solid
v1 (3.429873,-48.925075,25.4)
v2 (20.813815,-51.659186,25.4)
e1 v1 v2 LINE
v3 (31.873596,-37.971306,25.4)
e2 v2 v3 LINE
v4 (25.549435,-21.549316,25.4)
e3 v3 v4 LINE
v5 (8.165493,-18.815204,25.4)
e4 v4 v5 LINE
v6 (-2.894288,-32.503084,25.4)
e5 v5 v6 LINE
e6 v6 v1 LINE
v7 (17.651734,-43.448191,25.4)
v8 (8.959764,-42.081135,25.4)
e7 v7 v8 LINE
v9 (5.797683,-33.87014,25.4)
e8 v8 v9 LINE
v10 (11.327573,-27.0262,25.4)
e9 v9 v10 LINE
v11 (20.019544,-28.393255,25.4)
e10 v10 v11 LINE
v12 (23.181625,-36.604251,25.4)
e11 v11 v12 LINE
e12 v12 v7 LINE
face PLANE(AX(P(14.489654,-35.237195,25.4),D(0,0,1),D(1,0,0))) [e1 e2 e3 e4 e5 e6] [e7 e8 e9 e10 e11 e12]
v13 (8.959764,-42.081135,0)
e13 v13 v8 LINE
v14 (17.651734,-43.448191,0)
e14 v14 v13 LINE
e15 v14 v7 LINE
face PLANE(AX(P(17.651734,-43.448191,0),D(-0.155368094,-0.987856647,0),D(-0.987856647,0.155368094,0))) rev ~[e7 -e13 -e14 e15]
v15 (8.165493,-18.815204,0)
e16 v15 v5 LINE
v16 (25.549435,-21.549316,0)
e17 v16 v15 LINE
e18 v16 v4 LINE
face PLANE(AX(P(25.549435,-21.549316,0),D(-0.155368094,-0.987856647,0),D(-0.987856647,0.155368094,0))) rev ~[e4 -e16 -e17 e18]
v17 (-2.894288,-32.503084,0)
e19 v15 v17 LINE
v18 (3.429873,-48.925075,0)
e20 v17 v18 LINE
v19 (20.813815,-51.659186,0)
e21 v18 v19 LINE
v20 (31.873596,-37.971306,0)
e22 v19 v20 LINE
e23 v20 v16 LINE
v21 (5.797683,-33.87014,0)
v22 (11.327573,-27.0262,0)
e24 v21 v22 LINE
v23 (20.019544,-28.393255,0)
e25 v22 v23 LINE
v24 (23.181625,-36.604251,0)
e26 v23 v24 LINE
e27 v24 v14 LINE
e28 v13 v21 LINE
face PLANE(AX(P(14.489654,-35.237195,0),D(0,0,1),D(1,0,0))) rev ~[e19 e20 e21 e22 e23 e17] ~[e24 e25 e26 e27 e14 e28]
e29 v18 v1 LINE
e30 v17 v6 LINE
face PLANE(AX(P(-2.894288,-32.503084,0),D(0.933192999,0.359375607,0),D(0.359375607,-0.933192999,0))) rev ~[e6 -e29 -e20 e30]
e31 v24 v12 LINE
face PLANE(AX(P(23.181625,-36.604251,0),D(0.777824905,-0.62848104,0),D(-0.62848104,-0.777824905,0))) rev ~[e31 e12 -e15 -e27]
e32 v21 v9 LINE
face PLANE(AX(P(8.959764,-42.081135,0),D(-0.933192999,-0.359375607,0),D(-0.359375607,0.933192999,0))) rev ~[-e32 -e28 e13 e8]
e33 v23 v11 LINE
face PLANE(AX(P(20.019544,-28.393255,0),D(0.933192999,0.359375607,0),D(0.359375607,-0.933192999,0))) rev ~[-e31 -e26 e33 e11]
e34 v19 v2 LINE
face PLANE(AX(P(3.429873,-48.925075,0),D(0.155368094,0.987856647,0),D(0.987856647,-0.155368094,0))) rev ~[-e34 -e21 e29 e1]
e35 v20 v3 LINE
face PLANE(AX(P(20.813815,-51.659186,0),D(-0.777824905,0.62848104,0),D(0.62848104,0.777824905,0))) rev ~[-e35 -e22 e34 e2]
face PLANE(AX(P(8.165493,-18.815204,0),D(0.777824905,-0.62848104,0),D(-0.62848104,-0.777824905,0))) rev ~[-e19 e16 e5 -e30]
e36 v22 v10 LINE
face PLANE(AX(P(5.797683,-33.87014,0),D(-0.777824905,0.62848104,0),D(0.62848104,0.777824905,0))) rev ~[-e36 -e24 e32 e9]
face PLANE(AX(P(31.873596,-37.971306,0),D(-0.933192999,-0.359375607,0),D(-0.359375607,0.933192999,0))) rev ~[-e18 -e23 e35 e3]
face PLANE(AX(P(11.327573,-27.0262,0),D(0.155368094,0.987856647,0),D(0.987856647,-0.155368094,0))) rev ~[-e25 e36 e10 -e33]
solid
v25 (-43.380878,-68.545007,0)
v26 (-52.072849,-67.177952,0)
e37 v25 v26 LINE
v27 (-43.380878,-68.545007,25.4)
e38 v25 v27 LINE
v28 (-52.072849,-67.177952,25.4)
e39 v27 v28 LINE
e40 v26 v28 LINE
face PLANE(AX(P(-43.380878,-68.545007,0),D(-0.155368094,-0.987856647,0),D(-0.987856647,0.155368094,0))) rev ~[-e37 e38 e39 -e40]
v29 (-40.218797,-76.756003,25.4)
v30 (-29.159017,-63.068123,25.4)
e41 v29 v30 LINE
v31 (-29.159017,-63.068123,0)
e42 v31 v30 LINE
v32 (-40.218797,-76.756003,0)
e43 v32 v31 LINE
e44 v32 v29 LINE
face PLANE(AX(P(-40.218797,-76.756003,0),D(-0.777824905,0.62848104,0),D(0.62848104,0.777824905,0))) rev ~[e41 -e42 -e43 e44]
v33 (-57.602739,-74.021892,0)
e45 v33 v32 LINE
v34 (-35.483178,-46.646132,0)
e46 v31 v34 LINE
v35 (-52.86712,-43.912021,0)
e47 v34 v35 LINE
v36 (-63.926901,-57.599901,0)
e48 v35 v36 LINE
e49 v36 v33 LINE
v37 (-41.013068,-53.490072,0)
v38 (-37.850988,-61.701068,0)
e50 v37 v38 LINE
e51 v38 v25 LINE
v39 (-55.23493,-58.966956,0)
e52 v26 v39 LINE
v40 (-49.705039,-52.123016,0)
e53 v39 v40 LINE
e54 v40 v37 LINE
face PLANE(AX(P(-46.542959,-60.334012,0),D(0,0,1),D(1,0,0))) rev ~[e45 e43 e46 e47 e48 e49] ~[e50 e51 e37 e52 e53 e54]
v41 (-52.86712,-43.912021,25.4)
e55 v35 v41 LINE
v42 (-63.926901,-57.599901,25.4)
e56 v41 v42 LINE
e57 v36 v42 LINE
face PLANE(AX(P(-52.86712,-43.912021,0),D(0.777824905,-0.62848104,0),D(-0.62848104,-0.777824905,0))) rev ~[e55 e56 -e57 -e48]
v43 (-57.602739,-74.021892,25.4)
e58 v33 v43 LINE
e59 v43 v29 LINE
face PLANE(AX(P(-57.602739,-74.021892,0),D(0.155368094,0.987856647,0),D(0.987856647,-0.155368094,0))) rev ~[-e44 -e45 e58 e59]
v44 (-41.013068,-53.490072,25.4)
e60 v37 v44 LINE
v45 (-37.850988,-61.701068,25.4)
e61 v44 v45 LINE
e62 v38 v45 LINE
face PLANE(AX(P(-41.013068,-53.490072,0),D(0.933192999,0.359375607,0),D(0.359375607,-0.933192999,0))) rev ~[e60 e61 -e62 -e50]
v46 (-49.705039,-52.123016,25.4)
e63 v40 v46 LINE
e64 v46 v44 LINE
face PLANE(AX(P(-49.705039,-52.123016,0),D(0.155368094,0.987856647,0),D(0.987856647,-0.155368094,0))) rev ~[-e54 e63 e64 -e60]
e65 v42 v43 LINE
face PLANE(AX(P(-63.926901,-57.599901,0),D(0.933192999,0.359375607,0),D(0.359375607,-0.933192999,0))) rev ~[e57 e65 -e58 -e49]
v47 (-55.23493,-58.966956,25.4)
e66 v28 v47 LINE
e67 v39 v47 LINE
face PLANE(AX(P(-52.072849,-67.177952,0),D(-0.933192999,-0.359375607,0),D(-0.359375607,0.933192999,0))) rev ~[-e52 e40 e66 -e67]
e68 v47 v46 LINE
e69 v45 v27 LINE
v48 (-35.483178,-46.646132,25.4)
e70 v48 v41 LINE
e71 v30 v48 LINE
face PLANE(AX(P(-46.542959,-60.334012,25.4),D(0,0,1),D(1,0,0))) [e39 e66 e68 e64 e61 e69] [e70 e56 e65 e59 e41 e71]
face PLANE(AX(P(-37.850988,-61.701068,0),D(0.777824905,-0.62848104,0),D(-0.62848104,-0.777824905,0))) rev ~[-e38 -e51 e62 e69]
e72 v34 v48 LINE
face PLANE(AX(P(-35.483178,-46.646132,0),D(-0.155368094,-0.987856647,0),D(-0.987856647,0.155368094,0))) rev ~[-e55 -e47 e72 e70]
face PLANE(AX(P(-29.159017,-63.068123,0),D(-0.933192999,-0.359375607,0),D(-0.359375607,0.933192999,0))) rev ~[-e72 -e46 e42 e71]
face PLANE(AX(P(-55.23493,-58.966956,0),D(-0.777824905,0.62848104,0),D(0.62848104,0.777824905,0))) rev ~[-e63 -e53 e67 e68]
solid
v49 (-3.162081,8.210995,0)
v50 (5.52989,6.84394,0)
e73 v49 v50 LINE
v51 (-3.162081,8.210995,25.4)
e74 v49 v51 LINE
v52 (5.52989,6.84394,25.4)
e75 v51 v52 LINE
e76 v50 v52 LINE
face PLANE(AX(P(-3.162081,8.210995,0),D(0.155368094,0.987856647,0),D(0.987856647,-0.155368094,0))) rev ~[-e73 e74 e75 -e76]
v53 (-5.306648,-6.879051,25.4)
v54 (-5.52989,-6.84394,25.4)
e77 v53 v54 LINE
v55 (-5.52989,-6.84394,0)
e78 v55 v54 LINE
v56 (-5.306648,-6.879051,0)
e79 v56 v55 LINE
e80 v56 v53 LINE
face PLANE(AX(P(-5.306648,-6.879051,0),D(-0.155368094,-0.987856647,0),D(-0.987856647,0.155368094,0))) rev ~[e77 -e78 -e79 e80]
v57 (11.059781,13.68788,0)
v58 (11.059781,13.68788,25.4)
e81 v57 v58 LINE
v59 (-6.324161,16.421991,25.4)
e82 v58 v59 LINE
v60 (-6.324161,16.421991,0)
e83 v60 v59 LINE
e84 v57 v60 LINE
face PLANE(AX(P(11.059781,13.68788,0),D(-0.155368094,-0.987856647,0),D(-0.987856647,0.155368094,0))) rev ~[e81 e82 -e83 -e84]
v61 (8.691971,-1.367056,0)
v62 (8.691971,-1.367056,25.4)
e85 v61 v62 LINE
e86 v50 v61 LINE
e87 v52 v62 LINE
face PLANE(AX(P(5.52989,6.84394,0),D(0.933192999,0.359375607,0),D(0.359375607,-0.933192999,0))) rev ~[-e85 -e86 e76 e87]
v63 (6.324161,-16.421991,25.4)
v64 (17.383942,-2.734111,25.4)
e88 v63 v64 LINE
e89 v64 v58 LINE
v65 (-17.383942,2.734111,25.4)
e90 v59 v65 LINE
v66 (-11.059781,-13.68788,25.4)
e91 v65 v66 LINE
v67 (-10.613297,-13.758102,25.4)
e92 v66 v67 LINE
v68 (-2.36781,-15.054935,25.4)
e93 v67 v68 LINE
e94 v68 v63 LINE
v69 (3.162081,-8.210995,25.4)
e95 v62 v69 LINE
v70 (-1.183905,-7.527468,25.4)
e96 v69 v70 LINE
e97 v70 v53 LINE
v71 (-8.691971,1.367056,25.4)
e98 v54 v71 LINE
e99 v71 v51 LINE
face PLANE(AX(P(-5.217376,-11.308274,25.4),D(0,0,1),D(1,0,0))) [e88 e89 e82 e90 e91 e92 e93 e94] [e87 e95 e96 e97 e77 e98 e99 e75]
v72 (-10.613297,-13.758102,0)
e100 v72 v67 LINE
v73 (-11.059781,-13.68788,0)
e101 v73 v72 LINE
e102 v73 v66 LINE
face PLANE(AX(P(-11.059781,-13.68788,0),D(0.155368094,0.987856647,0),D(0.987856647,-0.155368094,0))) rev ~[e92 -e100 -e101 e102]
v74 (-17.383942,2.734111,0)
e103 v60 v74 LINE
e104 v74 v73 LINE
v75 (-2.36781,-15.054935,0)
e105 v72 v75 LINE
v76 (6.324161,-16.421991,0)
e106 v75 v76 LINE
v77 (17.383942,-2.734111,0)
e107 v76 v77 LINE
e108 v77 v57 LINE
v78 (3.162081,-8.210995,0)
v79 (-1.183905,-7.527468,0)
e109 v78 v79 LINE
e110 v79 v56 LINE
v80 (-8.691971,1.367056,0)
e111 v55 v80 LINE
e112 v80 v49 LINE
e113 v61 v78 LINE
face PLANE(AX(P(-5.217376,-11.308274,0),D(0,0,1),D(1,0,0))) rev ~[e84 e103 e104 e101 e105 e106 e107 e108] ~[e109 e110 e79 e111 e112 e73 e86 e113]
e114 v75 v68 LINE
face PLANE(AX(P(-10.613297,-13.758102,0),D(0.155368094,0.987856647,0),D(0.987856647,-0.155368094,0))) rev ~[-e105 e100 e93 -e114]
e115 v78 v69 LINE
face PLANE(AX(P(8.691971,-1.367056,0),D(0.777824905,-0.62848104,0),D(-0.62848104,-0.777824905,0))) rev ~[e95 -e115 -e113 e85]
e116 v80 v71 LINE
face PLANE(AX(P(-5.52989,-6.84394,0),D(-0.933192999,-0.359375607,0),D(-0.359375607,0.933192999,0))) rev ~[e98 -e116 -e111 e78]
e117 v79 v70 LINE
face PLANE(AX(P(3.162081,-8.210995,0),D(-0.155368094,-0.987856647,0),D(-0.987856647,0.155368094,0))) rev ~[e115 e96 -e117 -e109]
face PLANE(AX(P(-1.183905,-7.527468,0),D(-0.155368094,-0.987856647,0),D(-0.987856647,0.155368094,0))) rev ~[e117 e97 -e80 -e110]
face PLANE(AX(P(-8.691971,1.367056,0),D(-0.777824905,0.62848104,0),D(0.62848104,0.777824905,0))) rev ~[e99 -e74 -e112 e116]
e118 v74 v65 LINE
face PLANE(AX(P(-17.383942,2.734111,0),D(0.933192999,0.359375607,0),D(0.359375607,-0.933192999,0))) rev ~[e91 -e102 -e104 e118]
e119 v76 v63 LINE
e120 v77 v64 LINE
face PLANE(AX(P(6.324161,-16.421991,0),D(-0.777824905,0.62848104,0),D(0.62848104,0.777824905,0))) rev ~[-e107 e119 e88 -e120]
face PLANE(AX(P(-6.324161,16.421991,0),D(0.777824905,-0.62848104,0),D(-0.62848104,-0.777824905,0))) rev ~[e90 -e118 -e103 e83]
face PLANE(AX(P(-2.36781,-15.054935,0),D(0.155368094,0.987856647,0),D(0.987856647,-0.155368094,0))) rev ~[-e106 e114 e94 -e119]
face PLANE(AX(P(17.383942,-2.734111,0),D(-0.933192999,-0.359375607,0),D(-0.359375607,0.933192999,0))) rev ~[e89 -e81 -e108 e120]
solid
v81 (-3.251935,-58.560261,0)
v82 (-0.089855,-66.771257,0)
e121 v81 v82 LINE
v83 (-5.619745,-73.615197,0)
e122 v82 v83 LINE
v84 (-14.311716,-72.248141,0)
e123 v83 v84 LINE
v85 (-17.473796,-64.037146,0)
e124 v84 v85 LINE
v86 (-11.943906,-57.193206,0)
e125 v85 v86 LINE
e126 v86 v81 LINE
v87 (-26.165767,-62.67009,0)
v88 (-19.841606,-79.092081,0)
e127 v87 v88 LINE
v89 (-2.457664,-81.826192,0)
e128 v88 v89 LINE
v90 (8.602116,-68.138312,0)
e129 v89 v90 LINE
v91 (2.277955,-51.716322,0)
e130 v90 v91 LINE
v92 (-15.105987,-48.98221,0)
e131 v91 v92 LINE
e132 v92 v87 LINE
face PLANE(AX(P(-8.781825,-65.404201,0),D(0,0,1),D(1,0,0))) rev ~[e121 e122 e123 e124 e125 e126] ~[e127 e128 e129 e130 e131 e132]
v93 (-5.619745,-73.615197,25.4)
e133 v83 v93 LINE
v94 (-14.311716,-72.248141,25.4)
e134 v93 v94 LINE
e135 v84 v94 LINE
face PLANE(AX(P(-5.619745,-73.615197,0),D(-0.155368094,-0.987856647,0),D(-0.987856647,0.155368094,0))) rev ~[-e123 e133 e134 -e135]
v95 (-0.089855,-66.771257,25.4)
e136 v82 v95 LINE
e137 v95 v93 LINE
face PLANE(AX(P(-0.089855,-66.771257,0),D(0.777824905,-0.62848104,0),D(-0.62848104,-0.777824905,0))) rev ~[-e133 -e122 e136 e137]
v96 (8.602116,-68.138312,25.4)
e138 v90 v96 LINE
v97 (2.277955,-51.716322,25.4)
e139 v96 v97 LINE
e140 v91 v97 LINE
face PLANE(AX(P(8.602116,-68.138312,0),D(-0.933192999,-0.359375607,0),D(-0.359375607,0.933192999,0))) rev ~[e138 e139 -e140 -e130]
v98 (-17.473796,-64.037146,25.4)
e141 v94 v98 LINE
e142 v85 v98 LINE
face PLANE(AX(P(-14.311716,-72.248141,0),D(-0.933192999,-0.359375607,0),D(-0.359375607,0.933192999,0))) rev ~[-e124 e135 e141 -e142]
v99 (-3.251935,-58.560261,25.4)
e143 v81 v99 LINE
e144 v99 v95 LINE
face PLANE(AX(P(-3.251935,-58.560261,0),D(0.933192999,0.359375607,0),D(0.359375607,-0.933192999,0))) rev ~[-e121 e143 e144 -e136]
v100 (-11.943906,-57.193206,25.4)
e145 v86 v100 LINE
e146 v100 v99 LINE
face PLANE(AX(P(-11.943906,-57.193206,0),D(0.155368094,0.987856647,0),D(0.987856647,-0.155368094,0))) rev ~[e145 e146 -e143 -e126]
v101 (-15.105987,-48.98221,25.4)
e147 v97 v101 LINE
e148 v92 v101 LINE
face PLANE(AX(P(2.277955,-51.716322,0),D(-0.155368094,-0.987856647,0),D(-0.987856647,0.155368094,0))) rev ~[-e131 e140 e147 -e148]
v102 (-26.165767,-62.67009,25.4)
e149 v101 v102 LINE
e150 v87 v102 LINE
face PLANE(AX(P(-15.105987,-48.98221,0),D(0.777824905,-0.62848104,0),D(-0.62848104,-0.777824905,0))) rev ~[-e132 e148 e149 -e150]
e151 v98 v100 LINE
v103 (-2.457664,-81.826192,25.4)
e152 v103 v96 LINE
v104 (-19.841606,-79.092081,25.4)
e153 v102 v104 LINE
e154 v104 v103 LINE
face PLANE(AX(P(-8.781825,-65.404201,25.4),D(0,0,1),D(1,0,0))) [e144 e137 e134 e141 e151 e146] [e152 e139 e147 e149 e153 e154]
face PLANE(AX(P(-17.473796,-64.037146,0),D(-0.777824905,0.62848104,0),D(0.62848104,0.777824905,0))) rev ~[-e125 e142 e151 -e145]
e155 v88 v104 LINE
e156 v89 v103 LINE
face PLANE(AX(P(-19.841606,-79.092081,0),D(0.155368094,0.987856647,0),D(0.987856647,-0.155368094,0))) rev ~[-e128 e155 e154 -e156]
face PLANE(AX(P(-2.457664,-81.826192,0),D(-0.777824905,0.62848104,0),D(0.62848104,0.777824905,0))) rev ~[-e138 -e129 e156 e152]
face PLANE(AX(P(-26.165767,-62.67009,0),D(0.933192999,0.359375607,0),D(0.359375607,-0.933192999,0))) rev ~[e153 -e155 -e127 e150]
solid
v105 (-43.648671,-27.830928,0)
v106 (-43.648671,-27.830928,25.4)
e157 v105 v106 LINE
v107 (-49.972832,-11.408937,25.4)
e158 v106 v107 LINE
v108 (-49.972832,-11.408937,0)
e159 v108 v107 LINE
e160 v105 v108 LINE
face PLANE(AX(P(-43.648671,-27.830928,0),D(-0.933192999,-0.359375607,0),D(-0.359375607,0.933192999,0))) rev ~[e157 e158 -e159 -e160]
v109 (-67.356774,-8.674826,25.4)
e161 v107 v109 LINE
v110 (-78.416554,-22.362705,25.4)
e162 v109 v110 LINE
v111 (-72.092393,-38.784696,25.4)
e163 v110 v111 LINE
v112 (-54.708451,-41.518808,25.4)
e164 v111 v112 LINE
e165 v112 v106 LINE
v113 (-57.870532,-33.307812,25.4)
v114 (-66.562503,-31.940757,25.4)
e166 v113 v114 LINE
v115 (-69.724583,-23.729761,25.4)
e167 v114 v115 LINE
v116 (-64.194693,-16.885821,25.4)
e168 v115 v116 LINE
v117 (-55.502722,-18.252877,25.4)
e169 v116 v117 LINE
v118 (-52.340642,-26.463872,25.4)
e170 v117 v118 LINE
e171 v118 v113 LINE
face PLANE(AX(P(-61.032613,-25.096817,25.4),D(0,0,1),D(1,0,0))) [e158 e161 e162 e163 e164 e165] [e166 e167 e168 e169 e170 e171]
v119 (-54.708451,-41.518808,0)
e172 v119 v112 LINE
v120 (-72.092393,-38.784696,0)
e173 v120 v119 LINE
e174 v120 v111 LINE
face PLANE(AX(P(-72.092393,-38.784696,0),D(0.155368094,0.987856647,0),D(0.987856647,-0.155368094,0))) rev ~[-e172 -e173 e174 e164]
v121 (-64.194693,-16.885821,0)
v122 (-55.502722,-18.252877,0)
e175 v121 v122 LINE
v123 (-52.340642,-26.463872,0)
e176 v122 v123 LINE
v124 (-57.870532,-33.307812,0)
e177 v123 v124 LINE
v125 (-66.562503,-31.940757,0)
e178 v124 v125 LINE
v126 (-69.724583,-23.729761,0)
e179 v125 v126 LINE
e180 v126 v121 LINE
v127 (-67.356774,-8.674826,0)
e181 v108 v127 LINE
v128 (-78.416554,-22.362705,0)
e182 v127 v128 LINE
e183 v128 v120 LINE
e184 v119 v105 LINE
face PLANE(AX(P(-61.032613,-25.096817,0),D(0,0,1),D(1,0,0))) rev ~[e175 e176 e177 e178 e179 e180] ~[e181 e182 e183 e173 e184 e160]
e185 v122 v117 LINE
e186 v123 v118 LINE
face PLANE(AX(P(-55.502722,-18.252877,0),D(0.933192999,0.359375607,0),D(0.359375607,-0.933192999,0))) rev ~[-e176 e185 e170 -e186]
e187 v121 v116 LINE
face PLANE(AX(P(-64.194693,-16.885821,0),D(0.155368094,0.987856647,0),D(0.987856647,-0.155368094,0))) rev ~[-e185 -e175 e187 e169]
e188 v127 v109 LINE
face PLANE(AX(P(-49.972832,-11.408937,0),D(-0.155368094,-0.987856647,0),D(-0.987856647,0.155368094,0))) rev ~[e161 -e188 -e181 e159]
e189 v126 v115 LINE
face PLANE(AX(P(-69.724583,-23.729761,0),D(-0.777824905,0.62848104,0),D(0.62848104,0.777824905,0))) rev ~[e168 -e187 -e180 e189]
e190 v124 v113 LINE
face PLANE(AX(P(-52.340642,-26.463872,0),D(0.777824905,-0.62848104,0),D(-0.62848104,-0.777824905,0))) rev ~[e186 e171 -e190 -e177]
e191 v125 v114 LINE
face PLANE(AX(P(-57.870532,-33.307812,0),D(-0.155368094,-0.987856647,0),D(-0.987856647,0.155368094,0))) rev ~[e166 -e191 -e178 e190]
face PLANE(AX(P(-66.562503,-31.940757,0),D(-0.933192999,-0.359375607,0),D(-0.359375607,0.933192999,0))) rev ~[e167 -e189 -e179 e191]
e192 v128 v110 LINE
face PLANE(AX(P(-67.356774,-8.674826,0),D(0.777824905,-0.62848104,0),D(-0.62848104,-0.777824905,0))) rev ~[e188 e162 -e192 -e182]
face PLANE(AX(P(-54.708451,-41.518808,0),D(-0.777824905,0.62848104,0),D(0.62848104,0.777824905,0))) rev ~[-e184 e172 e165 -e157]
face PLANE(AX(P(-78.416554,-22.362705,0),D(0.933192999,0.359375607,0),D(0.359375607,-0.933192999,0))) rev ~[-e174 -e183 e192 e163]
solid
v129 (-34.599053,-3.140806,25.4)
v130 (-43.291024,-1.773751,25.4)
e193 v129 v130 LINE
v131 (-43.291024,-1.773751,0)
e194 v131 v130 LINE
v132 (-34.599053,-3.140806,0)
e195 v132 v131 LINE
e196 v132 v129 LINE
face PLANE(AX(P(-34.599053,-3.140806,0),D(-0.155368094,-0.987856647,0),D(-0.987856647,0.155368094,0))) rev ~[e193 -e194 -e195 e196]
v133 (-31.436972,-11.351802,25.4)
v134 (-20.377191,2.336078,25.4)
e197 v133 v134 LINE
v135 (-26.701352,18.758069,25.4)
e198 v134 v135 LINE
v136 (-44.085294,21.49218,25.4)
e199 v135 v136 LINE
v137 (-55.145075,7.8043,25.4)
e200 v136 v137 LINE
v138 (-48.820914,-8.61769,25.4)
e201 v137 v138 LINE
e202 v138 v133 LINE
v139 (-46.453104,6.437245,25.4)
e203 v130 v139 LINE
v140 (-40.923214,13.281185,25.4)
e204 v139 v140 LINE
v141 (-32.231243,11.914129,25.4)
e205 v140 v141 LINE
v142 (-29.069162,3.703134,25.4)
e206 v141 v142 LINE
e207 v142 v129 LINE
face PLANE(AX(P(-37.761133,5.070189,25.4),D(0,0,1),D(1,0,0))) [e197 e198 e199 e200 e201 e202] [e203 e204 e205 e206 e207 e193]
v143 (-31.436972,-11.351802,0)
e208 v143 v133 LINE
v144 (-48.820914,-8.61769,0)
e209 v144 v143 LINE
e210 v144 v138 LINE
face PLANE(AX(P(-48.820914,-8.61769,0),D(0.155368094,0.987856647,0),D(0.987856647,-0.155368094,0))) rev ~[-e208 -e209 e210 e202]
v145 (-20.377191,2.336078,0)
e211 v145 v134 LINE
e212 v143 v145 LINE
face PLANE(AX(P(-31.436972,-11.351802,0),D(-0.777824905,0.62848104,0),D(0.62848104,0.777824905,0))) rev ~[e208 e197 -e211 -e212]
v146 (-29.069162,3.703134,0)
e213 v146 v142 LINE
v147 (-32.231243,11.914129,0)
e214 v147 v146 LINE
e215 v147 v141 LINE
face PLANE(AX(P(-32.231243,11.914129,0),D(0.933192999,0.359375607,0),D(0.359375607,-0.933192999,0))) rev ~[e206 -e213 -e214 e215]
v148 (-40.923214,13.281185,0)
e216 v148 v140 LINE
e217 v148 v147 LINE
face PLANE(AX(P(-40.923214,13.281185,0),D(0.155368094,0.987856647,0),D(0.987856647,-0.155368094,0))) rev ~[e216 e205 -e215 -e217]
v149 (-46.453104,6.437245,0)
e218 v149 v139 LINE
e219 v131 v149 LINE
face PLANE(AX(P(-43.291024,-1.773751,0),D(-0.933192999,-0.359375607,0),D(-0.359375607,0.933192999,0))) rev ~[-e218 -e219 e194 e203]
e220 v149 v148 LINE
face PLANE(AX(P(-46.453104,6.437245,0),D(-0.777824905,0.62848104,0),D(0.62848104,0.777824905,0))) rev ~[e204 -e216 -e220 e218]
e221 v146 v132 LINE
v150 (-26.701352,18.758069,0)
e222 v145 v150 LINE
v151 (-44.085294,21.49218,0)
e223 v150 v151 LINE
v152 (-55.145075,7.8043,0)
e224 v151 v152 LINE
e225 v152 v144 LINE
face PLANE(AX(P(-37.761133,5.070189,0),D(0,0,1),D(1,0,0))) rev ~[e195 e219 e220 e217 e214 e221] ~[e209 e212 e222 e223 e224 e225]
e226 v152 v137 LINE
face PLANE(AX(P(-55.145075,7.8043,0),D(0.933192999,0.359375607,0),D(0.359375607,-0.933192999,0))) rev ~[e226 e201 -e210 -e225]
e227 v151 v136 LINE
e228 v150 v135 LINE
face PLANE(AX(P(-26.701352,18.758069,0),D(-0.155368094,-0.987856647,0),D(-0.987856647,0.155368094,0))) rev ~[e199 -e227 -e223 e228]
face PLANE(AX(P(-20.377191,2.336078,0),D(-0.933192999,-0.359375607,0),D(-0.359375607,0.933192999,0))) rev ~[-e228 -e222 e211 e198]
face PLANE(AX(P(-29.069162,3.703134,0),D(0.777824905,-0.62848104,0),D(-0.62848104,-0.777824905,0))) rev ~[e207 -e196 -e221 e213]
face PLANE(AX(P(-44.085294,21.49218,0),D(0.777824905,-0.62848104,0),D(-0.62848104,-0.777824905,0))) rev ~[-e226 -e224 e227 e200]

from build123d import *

# Parameters (mm, degrees)
F1_DEPTH = 25.4


with BuildPart() as f1:
    # F0 (on Top) → F1 (new body)
    with BuildSketch(Plane.XY):
        Polygon((-72.0923932347, -38.7846963805), (-54.7084513345, -41.518807573), (-43.648670635, -27.8309278658), (-49.9728318356, -11.4089369661), (-67.3567737358, -8.6748257736), (-78.4165544353, -22.3627054808), align=None)
        Polygon((-55.5027221854, -18.2528768197), (-52.3406415851, -26.4638722695), (-57.8705319349, -33.3078121231), (-66.5625028849, -31.9407565269), (-69.7245834852, -23.7297610771), (-64.1946931355, -16.8858212235), align=None, mode=Mode.SUBTRACT)
    extrude(amount=F1_DEPTH)


with BuildPart() as f1b:
    # F0 (on Top) → F1, piece 2 (new body)
    with BuildSketch(Plane.XY):
        Polygon((-55.1450750988, 7.8043004941), (-48.8209138982, -8.6176904056), (-31.436971998, -11.3518015981), (-20.3771912985, 2.3360781091), (-26.7013524991, 18.7580690088), (-44.0852943993, 21.4921802013), align=None)
        Polygon((-29.0691622486, 3.7031337054), (-34.5990525983, -3.1408061482), (-43.2910235484, -1.773750552), (-46.4531041487, 6.4372448978), (-40.9232137989, 13.2811847514), (-32.2312428489, 11.9141291552), align=None, mode=Mode.SUBTRACT)
    extrude(amount=F1_DEPTH)


with BuildPart() as f1c:
    # F0 (on Top) → F1, piece 3 (new body)
    with BuildSketch(Plane.XY):
        Polygon((-5.3066483048, -6.8790509105), (-10.6132966097, -13.758101821), (-2.3678097495, -15.0549353034), (-1.1839048747, -7.5274676517), align=None)
        Polygon((-6.3241612006, 16.4219908997), (-17.3839419001, 2.7341111925), (-11.0597806995, -13.6878797072), (-10.6132966097, -13.758101821), (-5.3066483048, -6.8790509105), (-5.5298903498, -6.8439398536), (-8.6919709501, 1.3670555962), (-3.1620806003, 8.2109954498), (5.5298903498, 6.8439398536), (8.6919709501, -1.3670555962), (3.1620806003, -8.2109954498), (-1.1839048747, -7.5274676517), (-2.3678097495, -15.0549353034), (6.3241612006, -16.4219908997), (17.3839419001, -2.7341111925), (11.0597806995, 13.6878797072), align=None)
    extrude(amount=F1_DEPTH)


with BuildPart() as f1d:
    # F0 (on Top) → F1, piece 4 (new body)
    with BuildSketch(Plane.XY):
        Polygon((25.5494345617, -21.5493155693), (8.1654926615, -18.8152043769), (-2.894288038, -32.503084084), (3.4298731626, -48.9250749837), (20.8138150627, -51.6591861762), (31.8735957623, -37.971306469), align=None)
        Polygon((8.9597635124, -42.0811351301), (5.7976829121, -33.8701396803), (11.3275732618, -27.0261998267), (20.0195442119, -28.3932554229), (23.1816248122, -36.6042508728), (17.6517344624, -43.4481907264), align=None, mode=Mode.SUBTRACT)
    extrude(amount=F1_DEPTH)


with BuildPart() as f1e:
    # F0 (on Top) → F1, piece 5 (new body)
    with BuildSketch(Plane.XY):
        Polygon((8.6021164258, -68.1383124439), (2.2779552252, -51.7163215442), (-15.105986675, -48.9822103518), (-26.1657673745, -62.670090059), (-19.8416061739, -79.0920809586), (-2.4576642738, -81.8261921511), align=None)
        Polygon((-17.4737964244, -64.0371456552), (-11.9439060747, -57.1932058016), (-3.2519351246, -58.5602613978), (-0.0898545243, -66.7712568477), (-5.6197448741, -73.6151967013), (-14.3117158241, -72.248141105), align=None, mode=Mode.SUBTRACT)
    extrude(amount=F1_DEPTH)


with BuildPart() as f1f:
    # F0 (on Top) → F1, piece 6 (new body)
    with BuildSketch(Plane.XY):
        Polygon((-40.2187974724, -76.7560028495), (-29.1590167729, -63.0681231423), (-35.4831779735, -46.6461322426), (-52.8671198736, -43.9120210502), (-63.9269005732, -57.5999007573), (-57.6027393725, -74.021891657), align=None)
        Polygon((-49.7050392733, -52.1230165), (-41.0130683233, -53.4900720962), (-37.850987723, -61.7010675461), (-43.3808780727, -68.5450073997), (-52.0728490228, -67.1779518034), (-55.2349296231, -58.9669563536), align=None, mode=Mode.SUBTRACT)
    extrude(amount=F1_DEPTH)


solid = Compound([f1.part, f1b.part, f1c.part, f1d.part, f1e.part, f1f.part])
